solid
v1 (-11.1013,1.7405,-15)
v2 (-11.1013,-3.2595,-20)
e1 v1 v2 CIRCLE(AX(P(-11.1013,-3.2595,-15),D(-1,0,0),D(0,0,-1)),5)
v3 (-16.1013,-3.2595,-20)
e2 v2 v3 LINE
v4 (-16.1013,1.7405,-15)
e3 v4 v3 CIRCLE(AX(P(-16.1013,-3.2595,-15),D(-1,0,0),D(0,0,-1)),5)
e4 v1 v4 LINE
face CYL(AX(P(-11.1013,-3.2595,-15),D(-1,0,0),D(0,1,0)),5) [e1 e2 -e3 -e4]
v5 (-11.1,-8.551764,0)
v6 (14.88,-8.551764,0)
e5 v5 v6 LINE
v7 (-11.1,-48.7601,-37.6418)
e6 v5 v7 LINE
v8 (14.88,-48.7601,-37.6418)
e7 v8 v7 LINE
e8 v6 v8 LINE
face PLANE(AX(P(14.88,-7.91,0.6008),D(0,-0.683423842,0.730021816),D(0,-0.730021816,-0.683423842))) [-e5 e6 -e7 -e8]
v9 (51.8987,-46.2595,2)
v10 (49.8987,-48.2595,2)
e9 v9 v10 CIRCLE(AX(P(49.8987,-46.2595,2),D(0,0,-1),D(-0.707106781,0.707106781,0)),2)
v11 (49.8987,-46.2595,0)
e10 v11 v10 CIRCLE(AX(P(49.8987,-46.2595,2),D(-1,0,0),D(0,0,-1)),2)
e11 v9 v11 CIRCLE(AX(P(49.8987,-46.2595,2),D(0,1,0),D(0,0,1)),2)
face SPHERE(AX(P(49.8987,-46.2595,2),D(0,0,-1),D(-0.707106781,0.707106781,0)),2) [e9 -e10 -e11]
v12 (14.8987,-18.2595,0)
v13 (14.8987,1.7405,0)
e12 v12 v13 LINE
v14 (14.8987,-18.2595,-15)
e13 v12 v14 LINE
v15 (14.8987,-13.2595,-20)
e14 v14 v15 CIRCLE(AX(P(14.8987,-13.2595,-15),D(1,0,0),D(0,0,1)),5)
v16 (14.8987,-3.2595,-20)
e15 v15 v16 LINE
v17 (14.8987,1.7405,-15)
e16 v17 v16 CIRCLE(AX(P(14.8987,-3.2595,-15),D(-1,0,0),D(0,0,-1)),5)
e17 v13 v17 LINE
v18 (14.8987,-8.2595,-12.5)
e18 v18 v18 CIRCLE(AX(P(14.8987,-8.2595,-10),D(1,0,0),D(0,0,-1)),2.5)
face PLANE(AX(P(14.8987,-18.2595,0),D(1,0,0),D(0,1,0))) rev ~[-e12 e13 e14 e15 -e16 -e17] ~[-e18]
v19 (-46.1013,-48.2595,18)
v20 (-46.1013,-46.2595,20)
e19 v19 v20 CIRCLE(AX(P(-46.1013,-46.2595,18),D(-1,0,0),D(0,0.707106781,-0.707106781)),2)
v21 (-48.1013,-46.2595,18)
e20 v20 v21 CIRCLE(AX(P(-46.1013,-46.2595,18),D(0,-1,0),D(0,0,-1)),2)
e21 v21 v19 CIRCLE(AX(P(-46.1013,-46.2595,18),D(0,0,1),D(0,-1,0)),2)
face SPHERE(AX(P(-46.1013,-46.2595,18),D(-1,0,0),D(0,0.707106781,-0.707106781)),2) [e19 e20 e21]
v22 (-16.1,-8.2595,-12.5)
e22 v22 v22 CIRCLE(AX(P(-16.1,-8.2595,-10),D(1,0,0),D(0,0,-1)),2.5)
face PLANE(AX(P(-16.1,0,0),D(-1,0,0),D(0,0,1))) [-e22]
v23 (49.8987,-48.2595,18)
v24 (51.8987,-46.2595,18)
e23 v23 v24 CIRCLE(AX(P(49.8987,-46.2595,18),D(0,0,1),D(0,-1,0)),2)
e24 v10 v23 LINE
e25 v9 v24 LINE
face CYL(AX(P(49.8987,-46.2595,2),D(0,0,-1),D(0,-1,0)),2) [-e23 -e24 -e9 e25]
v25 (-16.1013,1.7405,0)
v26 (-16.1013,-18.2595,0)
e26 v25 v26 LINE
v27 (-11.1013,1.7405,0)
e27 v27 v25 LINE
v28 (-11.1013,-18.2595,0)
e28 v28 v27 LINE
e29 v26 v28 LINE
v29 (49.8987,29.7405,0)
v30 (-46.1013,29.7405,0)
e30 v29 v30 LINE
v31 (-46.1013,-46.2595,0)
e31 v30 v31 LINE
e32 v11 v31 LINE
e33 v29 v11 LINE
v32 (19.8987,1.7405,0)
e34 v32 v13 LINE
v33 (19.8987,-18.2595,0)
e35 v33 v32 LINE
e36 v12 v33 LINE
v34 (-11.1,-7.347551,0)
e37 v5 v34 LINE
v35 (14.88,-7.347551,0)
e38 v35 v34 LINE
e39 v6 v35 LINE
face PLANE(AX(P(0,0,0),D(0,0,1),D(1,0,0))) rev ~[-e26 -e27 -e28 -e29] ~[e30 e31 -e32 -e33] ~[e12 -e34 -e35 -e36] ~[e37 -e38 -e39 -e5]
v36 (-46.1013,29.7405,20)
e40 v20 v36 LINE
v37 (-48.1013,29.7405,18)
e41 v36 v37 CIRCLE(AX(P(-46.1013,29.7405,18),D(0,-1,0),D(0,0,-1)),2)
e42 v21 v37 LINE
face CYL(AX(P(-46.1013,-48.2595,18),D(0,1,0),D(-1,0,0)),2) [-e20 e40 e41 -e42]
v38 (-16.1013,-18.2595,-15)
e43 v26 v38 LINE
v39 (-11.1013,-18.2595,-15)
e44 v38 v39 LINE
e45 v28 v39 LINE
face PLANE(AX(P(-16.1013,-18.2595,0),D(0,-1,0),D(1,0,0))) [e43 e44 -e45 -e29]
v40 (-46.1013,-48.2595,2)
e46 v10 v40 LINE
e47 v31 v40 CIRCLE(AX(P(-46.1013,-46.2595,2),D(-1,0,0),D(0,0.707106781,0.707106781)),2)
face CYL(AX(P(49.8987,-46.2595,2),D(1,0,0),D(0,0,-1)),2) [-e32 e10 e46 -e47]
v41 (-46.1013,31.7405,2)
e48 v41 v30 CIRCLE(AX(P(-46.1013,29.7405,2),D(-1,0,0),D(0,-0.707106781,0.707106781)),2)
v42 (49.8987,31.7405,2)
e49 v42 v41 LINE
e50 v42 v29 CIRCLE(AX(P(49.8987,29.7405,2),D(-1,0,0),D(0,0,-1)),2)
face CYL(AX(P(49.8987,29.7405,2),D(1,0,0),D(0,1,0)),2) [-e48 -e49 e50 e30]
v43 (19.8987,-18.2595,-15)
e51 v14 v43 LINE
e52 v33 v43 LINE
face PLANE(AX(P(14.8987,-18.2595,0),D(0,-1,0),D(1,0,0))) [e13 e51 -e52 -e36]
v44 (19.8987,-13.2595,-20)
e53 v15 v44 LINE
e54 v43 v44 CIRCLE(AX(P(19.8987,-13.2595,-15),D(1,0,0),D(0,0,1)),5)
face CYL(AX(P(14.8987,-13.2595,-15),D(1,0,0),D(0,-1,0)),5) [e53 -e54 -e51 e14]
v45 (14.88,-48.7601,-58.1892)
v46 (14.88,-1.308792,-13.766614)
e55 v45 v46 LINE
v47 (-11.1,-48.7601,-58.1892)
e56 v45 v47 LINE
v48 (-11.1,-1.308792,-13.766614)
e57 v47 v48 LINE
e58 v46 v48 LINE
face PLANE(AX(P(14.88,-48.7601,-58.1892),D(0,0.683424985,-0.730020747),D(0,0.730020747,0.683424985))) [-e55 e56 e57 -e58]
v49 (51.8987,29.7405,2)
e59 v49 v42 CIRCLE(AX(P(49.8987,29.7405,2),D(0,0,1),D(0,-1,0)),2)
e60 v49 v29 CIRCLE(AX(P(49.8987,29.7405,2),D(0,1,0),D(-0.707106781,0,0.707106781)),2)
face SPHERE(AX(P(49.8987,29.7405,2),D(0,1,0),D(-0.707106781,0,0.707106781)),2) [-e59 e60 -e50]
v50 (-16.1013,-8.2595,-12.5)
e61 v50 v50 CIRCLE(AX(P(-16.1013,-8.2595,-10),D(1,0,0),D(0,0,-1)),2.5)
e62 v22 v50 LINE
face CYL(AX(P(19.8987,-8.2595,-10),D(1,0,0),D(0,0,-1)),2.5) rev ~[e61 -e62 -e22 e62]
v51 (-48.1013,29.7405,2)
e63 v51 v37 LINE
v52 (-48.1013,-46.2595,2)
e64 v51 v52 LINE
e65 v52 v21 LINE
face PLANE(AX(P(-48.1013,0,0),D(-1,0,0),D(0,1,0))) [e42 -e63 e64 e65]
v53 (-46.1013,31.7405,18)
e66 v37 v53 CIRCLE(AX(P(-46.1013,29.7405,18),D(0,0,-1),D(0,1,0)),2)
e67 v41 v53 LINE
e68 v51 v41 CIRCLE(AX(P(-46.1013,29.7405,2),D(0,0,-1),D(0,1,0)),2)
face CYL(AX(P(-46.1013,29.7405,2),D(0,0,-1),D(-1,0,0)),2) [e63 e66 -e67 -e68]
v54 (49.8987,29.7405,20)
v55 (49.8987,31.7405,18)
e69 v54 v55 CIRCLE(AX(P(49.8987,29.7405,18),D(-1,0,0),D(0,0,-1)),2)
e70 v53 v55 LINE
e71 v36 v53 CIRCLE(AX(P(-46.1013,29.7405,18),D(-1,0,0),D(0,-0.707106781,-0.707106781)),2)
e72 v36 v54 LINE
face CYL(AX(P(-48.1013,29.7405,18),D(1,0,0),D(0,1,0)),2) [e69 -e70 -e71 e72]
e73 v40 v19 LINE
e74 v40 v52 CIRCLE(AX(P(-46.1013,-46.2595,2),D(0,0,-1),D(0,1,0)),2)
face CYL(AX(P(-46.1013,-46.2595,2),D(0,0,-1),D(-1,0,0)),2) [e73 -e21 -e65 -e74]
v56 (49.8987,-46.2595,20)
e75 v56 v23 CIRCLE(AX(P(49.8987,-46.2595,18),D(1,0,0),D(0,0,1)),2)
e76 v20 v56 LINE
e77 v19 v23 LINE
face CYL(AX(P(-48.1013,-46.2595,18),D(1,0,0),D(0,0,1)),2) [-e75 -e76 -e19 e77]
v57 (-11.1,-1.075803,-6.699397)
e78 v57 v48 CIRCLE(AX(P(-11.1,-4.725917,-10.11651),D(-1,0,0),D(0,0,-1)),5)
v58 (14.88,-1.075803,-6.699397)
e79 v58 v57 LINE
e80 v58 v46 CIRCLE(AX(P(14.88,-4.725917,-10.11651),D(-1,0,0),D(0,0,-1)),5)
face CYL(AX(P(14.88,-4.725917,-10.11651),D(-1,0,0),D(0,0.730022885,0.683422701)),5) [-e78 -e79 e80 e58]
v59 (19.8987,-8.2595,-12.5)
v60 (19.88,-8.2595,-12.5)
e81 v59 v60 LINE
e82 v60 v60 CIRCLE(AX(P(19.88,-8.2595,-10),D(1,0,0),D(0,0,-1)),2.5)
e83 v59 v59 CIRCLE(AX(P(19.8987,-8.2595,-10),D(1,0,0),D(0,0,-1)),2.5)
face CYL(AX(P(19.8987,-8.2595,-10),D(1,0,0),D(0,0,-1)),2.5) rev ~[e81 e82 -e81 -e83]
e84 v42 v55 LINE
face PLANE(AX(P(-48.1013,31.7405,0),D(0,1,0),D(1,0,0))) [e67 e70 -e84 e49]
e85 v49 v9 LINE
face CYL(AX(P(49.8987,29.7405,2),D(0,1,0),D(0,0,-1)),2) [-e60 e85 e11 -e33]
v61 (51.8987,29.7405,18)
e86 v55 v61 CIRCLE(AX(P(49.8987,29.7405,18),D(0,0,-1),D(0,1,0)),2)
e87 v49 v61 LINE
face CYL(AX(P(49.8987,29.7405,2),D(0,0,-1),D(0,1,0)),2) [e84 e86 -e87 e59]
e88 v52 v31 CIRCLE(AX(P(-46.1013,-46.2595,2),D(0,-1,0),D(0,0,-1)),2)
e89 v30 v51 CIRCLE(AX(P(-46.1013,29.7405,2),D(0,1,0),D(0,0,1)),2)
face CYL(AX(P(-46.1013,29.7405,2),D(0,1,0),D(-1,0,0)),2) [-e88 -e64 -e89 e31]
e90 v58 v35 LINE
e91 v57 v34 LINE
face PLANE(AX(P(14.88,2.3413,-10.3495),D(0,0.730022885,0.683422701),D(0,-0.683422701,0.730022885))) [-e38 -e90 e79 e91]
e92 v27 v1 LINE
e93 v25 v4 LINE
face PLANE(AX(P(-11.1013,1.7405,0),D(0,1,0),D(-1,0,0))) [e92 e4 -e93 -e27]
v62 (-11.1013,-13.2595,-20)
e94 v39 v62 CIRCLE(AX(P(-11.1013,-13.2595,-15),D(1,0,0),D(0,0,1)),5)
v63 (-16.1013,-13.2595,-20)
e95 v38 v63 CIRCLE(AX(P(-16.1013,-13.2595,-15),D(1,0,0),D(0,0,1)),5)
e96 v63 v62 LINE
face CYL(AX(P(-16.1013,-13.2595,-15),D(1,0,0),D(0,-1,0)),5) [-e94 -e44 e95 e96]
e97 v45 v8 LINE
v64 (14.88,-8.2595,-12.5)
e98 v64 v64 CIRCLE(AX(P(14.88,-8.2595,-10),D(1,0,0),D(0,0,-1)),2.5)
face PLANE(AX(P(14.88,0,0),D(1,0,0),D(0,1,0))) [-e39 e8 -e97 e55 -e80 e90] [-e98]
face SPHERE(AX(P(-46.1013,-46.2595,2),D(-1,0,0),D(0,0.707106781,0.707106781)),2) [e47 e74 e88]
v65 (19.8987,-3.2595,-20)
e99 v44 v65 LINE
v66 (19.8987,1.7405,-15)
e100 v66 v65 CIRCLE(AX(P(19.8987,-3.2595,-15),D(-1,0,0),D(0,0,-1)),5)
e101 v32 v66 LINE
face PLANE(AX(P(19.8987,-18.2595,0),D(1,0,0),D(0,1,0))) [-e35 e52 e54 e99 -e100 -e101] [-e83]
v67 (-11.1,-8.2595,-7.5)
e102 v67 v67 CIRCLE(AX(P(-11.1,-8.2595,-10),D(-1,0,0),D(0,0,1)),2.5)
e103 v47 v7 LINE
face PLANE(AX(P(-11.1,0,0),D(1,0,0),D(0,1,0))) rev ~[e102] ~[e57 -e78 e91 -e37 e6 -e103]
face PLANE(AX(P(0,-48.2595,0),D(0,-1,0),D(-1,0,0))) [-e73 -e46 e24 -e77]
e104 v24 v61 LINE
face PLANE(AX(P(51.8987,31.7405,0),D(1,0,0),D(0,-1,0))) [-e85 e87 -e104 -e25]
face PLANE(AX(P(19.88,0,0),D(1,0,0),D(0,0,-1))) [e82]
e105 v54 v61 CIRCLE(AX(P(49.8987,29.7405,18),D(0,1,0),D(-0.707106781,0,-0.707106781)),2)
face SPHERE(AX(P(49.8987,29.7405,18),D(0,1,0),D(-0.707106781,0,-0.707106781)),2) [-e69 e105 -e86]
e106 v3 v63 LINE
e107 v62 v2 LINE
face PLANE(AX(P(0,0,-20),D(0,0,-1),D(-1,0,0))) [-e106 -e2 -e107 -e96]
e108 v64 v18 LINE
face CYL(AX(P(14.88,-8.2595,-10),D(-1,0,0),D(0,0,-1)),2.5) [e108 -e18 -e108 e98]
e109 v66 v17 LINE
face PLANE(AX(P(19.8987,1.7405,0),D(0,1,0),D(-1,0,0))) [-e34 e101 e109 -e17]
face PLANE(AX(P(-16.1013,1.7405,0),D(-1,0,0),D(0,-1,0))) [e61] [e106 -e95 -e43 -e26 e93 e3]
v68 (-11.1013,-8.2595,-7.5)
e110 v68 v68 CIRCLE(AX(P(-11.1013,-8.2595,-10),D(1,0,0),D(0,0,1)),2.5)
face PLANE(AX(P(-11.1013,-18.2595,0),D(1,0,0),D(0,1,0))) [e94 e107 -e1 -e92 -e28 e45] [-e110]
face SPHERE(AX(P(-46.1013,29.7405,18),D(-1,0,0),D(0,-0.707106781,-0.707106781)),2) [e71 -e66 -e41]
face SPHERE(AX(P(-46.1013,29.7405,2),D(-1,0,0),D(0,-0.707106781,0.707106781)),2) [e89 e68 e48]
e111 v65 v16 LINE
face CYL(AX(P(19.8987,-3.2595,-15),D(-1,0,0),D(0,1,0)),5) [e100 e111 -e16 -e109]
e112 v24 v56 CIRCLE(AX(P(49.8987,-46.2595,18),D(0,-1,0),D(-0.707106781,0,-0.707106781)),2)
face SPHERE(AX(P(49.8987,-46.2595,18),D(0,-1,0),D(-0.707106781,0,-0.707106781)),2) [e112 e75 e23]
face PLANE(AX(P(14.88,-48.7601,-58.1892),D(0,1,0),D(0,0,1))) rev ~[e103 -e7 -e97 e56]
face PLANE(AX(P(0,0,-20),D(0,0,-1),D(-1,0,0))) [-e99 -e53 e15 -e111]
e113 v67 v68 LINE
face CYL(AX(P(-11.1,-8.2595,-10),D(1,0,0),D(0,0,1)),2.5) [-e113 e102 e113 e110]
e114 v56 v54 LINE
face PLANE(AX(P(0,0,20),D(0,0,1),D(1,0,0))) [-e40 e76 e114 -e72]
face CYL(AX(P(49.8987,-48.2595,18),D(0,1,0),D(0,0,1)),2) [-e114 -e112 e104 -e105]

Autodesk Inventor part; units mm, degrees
ref_plane "XZ Plane" through (0, 0, 0) normal (0, 1, 0) x (-1, 0, 0)
ref_plane "XY Plane" through (0, 0, 0) normal (0, 0, 1) x (1, 0, 0)
sketch "Skizze1" plane through (0, 0, 0) normal (0, 0, 1) x (1, 0, 0)
  line L0 (-68.1013, 0) -> (71.8987, 0) projected
  line L1 (0, -64.8603) -> (0, 47.8406) projected
  line L2 (-48.1013, 31.7405) -> (51.8987, 31.7405)
  line L3 (51.8987, 31.7405) -> (51.8987, -48.2595)
  line L4 (51.8987, -48.2595) -> (-48.1013, -48.2595)
  line L5 (-48.1013, -48.2595) -> (-48.1013, 31.7405)
  point P0 (0, 0)
  dimension "d0" = 100
  dimension "d1" = 80
extrude "Extrusion1" add sketch "Skizze1" along normal blind 20
fillet "Rundung1" radius 2 4 edges at (1.8987, 31.7405, 20) (-48.1013, -8.2595, 20) (51.8987, -8.2595, 20) (1.8987, -48.2595, 20)
fillet "Rundung2" radius 2 12 edges at (51.8987, -8.2595, 0) (1.8987, 31.7405, 0) (1.8987, -48.2595, 0) (-48.1013, -8.2595, 0) (51.3129, 31.1547, 19.4142) (51.8987, 31.7405, 9) (-47.5155, 31.1547, 19.4142) (-48.1013, 31.7405, 9) (51.3129, -47.6737, 19.4142) (51.8987, -48.2595, 9) (-47.5155, -47.6737, 19.4142) (-48.1013, -48.2595, 9)
sketch "Skizze2" plane through (0, 0, 0) normal (0, 0, -1) x (-1, 0, 0)
  line L0 (16.1013, 1.7405) -> (16.1013, -18.2595)
  line L1 (-19.8987, -18.2595) -> (-19.8987, 1.7405)
  line L2 (-49.8987, 29.7405) -> (46.1013, 29.7405) projected
  line L3 (-49.8987, -46.2595) -> (-49.8987, 29.7405) projected
  line L4 (46.1013, 29.7405) -> (46.1013, -46.2595) projected
  line L5 (-14.8987, -18.2595) -> (-14.8987, 1.7405)
  line L6 (11.1013, -18.2595) -> (11.1013, 1.7405)
  line L7 (-19.8987, 1.7405) -> (-14.8987, 1.7405)
  line L8 (11.1013, 1.7405) -> (16.1013, 1.7405)
  line L9 (16.1013, -18.2595) -> (11.1013, -18.2595)
  line L10 (-14.8987, -18.2595) -> (-19.8987, -18.2595)
  point P0 (0, 0)
  dimension "d8" = 30
  dimension "d9" = 30
  dimension "d10" = 5
  dimension "d11" = 5
  dimension "d12" = 20
  dimension "d13" = 20
extrude "Extrusion2" add sketch "Skizze2" along normal blind 20
fillet "Rundung3" radius 5 4 edges at (17.3987, 1.7405, -20) (17.3987, -18.2595, -20) (-13.6013, 1.7405, -20) (-13.6013, -18.2595, -20)
sketch "Skizze3" plane through (0, 0, 20) normal (0, 0, 1) x (1, 0, 0)
  point P0 (0, 0)
sketch "Skizze4" plane through (19.8987, -18.2595, 0) normal (1, 0, 0) x (0, 0, -1)
  line L0 (0, 0) -> (15, 0) projected
  line L1 (20, 15) -> (20, 5) projected
  circle A0 centre (10, 10) radius 2.5
  point P0 (0, 18.2595)
  dimension "d17" = 10
  dimension "d18" = 10
  dimension "d19" = 5
extrude "Extrusion3" cut sketch "Skizze4" against normal blind 40
sketch "Skizze5" plane through (19.8987, -18.2595, 0) normal (1, 0, 0) x (0, 0, -1)
  point P0 (0, 18.2595)
ref_plane "Arbeitsebene1" through (14.88, 0, 0) normal (1, 0, 0) x (0, 1, 0)
sketch "Skizze6" plane through (14.88, 0, 0) normal (1, 0, 0) x (0, 1, 0)
  line L0 (-7.91, 0.6008) -> (-48.7601, -37.6418)
  line L1 (-48.7601, -58.1892) -> (2.3413, -10.3495)
  line L2 (2.3413, -10.3495) -> (-7.91, 0.6008)
  circle A0 centre (-8.2595, -10) radius 2.5 projected
  line L3 (-48.7601, -58.1892) -> (-48.7601, -37.6418)
  point P0 (0, 0)
  dimension "d23" = 7.5
  dimension "d24" = 7.5
  dimension "d25" = 15
  dimension "d26" = 70
  dimension "d27" = 46.888
extrude "Extrusion4" add sketch "Skizze6" against normal blind 25.98 contours L2 L1 L3 L0 | A0
fillet "Rundung4" radius 5 1 edges at (1.89, 2.3413, -10.3495)
sketch "Skizze7" plane through (-11.1, 0, 0) normal (-1, 0, 0) x (0, 0, 1)
  circle A0 centre (-10, -8.2595) radius 2.5 projected
  circle A1 centre (-10, -8.2595) radius 2.5
  point P0 (0, 0)
  point P1 (-10.0246, -8.2595)
  dimension "d31" = 0
extrude "Extrusion5" add sketch "Skizze7" along normal blind 5
sketch "Skizze8" plane through (14.88, 0, 0) normal (1, 0, 0) x (0, 0, -1)
  circle A0 centre (10, -8.2595) radius 2.5 projected
  circle A1 centre (10, -8.2595) radius 2.5
  point P0 (0, 0)
  point P1 (9.9522, -8.2595)
  dimension "d34" = 0
extrude "Extrusion6" add sketch "Skizze8" along normal blind 5
properties part number "Lampe"
